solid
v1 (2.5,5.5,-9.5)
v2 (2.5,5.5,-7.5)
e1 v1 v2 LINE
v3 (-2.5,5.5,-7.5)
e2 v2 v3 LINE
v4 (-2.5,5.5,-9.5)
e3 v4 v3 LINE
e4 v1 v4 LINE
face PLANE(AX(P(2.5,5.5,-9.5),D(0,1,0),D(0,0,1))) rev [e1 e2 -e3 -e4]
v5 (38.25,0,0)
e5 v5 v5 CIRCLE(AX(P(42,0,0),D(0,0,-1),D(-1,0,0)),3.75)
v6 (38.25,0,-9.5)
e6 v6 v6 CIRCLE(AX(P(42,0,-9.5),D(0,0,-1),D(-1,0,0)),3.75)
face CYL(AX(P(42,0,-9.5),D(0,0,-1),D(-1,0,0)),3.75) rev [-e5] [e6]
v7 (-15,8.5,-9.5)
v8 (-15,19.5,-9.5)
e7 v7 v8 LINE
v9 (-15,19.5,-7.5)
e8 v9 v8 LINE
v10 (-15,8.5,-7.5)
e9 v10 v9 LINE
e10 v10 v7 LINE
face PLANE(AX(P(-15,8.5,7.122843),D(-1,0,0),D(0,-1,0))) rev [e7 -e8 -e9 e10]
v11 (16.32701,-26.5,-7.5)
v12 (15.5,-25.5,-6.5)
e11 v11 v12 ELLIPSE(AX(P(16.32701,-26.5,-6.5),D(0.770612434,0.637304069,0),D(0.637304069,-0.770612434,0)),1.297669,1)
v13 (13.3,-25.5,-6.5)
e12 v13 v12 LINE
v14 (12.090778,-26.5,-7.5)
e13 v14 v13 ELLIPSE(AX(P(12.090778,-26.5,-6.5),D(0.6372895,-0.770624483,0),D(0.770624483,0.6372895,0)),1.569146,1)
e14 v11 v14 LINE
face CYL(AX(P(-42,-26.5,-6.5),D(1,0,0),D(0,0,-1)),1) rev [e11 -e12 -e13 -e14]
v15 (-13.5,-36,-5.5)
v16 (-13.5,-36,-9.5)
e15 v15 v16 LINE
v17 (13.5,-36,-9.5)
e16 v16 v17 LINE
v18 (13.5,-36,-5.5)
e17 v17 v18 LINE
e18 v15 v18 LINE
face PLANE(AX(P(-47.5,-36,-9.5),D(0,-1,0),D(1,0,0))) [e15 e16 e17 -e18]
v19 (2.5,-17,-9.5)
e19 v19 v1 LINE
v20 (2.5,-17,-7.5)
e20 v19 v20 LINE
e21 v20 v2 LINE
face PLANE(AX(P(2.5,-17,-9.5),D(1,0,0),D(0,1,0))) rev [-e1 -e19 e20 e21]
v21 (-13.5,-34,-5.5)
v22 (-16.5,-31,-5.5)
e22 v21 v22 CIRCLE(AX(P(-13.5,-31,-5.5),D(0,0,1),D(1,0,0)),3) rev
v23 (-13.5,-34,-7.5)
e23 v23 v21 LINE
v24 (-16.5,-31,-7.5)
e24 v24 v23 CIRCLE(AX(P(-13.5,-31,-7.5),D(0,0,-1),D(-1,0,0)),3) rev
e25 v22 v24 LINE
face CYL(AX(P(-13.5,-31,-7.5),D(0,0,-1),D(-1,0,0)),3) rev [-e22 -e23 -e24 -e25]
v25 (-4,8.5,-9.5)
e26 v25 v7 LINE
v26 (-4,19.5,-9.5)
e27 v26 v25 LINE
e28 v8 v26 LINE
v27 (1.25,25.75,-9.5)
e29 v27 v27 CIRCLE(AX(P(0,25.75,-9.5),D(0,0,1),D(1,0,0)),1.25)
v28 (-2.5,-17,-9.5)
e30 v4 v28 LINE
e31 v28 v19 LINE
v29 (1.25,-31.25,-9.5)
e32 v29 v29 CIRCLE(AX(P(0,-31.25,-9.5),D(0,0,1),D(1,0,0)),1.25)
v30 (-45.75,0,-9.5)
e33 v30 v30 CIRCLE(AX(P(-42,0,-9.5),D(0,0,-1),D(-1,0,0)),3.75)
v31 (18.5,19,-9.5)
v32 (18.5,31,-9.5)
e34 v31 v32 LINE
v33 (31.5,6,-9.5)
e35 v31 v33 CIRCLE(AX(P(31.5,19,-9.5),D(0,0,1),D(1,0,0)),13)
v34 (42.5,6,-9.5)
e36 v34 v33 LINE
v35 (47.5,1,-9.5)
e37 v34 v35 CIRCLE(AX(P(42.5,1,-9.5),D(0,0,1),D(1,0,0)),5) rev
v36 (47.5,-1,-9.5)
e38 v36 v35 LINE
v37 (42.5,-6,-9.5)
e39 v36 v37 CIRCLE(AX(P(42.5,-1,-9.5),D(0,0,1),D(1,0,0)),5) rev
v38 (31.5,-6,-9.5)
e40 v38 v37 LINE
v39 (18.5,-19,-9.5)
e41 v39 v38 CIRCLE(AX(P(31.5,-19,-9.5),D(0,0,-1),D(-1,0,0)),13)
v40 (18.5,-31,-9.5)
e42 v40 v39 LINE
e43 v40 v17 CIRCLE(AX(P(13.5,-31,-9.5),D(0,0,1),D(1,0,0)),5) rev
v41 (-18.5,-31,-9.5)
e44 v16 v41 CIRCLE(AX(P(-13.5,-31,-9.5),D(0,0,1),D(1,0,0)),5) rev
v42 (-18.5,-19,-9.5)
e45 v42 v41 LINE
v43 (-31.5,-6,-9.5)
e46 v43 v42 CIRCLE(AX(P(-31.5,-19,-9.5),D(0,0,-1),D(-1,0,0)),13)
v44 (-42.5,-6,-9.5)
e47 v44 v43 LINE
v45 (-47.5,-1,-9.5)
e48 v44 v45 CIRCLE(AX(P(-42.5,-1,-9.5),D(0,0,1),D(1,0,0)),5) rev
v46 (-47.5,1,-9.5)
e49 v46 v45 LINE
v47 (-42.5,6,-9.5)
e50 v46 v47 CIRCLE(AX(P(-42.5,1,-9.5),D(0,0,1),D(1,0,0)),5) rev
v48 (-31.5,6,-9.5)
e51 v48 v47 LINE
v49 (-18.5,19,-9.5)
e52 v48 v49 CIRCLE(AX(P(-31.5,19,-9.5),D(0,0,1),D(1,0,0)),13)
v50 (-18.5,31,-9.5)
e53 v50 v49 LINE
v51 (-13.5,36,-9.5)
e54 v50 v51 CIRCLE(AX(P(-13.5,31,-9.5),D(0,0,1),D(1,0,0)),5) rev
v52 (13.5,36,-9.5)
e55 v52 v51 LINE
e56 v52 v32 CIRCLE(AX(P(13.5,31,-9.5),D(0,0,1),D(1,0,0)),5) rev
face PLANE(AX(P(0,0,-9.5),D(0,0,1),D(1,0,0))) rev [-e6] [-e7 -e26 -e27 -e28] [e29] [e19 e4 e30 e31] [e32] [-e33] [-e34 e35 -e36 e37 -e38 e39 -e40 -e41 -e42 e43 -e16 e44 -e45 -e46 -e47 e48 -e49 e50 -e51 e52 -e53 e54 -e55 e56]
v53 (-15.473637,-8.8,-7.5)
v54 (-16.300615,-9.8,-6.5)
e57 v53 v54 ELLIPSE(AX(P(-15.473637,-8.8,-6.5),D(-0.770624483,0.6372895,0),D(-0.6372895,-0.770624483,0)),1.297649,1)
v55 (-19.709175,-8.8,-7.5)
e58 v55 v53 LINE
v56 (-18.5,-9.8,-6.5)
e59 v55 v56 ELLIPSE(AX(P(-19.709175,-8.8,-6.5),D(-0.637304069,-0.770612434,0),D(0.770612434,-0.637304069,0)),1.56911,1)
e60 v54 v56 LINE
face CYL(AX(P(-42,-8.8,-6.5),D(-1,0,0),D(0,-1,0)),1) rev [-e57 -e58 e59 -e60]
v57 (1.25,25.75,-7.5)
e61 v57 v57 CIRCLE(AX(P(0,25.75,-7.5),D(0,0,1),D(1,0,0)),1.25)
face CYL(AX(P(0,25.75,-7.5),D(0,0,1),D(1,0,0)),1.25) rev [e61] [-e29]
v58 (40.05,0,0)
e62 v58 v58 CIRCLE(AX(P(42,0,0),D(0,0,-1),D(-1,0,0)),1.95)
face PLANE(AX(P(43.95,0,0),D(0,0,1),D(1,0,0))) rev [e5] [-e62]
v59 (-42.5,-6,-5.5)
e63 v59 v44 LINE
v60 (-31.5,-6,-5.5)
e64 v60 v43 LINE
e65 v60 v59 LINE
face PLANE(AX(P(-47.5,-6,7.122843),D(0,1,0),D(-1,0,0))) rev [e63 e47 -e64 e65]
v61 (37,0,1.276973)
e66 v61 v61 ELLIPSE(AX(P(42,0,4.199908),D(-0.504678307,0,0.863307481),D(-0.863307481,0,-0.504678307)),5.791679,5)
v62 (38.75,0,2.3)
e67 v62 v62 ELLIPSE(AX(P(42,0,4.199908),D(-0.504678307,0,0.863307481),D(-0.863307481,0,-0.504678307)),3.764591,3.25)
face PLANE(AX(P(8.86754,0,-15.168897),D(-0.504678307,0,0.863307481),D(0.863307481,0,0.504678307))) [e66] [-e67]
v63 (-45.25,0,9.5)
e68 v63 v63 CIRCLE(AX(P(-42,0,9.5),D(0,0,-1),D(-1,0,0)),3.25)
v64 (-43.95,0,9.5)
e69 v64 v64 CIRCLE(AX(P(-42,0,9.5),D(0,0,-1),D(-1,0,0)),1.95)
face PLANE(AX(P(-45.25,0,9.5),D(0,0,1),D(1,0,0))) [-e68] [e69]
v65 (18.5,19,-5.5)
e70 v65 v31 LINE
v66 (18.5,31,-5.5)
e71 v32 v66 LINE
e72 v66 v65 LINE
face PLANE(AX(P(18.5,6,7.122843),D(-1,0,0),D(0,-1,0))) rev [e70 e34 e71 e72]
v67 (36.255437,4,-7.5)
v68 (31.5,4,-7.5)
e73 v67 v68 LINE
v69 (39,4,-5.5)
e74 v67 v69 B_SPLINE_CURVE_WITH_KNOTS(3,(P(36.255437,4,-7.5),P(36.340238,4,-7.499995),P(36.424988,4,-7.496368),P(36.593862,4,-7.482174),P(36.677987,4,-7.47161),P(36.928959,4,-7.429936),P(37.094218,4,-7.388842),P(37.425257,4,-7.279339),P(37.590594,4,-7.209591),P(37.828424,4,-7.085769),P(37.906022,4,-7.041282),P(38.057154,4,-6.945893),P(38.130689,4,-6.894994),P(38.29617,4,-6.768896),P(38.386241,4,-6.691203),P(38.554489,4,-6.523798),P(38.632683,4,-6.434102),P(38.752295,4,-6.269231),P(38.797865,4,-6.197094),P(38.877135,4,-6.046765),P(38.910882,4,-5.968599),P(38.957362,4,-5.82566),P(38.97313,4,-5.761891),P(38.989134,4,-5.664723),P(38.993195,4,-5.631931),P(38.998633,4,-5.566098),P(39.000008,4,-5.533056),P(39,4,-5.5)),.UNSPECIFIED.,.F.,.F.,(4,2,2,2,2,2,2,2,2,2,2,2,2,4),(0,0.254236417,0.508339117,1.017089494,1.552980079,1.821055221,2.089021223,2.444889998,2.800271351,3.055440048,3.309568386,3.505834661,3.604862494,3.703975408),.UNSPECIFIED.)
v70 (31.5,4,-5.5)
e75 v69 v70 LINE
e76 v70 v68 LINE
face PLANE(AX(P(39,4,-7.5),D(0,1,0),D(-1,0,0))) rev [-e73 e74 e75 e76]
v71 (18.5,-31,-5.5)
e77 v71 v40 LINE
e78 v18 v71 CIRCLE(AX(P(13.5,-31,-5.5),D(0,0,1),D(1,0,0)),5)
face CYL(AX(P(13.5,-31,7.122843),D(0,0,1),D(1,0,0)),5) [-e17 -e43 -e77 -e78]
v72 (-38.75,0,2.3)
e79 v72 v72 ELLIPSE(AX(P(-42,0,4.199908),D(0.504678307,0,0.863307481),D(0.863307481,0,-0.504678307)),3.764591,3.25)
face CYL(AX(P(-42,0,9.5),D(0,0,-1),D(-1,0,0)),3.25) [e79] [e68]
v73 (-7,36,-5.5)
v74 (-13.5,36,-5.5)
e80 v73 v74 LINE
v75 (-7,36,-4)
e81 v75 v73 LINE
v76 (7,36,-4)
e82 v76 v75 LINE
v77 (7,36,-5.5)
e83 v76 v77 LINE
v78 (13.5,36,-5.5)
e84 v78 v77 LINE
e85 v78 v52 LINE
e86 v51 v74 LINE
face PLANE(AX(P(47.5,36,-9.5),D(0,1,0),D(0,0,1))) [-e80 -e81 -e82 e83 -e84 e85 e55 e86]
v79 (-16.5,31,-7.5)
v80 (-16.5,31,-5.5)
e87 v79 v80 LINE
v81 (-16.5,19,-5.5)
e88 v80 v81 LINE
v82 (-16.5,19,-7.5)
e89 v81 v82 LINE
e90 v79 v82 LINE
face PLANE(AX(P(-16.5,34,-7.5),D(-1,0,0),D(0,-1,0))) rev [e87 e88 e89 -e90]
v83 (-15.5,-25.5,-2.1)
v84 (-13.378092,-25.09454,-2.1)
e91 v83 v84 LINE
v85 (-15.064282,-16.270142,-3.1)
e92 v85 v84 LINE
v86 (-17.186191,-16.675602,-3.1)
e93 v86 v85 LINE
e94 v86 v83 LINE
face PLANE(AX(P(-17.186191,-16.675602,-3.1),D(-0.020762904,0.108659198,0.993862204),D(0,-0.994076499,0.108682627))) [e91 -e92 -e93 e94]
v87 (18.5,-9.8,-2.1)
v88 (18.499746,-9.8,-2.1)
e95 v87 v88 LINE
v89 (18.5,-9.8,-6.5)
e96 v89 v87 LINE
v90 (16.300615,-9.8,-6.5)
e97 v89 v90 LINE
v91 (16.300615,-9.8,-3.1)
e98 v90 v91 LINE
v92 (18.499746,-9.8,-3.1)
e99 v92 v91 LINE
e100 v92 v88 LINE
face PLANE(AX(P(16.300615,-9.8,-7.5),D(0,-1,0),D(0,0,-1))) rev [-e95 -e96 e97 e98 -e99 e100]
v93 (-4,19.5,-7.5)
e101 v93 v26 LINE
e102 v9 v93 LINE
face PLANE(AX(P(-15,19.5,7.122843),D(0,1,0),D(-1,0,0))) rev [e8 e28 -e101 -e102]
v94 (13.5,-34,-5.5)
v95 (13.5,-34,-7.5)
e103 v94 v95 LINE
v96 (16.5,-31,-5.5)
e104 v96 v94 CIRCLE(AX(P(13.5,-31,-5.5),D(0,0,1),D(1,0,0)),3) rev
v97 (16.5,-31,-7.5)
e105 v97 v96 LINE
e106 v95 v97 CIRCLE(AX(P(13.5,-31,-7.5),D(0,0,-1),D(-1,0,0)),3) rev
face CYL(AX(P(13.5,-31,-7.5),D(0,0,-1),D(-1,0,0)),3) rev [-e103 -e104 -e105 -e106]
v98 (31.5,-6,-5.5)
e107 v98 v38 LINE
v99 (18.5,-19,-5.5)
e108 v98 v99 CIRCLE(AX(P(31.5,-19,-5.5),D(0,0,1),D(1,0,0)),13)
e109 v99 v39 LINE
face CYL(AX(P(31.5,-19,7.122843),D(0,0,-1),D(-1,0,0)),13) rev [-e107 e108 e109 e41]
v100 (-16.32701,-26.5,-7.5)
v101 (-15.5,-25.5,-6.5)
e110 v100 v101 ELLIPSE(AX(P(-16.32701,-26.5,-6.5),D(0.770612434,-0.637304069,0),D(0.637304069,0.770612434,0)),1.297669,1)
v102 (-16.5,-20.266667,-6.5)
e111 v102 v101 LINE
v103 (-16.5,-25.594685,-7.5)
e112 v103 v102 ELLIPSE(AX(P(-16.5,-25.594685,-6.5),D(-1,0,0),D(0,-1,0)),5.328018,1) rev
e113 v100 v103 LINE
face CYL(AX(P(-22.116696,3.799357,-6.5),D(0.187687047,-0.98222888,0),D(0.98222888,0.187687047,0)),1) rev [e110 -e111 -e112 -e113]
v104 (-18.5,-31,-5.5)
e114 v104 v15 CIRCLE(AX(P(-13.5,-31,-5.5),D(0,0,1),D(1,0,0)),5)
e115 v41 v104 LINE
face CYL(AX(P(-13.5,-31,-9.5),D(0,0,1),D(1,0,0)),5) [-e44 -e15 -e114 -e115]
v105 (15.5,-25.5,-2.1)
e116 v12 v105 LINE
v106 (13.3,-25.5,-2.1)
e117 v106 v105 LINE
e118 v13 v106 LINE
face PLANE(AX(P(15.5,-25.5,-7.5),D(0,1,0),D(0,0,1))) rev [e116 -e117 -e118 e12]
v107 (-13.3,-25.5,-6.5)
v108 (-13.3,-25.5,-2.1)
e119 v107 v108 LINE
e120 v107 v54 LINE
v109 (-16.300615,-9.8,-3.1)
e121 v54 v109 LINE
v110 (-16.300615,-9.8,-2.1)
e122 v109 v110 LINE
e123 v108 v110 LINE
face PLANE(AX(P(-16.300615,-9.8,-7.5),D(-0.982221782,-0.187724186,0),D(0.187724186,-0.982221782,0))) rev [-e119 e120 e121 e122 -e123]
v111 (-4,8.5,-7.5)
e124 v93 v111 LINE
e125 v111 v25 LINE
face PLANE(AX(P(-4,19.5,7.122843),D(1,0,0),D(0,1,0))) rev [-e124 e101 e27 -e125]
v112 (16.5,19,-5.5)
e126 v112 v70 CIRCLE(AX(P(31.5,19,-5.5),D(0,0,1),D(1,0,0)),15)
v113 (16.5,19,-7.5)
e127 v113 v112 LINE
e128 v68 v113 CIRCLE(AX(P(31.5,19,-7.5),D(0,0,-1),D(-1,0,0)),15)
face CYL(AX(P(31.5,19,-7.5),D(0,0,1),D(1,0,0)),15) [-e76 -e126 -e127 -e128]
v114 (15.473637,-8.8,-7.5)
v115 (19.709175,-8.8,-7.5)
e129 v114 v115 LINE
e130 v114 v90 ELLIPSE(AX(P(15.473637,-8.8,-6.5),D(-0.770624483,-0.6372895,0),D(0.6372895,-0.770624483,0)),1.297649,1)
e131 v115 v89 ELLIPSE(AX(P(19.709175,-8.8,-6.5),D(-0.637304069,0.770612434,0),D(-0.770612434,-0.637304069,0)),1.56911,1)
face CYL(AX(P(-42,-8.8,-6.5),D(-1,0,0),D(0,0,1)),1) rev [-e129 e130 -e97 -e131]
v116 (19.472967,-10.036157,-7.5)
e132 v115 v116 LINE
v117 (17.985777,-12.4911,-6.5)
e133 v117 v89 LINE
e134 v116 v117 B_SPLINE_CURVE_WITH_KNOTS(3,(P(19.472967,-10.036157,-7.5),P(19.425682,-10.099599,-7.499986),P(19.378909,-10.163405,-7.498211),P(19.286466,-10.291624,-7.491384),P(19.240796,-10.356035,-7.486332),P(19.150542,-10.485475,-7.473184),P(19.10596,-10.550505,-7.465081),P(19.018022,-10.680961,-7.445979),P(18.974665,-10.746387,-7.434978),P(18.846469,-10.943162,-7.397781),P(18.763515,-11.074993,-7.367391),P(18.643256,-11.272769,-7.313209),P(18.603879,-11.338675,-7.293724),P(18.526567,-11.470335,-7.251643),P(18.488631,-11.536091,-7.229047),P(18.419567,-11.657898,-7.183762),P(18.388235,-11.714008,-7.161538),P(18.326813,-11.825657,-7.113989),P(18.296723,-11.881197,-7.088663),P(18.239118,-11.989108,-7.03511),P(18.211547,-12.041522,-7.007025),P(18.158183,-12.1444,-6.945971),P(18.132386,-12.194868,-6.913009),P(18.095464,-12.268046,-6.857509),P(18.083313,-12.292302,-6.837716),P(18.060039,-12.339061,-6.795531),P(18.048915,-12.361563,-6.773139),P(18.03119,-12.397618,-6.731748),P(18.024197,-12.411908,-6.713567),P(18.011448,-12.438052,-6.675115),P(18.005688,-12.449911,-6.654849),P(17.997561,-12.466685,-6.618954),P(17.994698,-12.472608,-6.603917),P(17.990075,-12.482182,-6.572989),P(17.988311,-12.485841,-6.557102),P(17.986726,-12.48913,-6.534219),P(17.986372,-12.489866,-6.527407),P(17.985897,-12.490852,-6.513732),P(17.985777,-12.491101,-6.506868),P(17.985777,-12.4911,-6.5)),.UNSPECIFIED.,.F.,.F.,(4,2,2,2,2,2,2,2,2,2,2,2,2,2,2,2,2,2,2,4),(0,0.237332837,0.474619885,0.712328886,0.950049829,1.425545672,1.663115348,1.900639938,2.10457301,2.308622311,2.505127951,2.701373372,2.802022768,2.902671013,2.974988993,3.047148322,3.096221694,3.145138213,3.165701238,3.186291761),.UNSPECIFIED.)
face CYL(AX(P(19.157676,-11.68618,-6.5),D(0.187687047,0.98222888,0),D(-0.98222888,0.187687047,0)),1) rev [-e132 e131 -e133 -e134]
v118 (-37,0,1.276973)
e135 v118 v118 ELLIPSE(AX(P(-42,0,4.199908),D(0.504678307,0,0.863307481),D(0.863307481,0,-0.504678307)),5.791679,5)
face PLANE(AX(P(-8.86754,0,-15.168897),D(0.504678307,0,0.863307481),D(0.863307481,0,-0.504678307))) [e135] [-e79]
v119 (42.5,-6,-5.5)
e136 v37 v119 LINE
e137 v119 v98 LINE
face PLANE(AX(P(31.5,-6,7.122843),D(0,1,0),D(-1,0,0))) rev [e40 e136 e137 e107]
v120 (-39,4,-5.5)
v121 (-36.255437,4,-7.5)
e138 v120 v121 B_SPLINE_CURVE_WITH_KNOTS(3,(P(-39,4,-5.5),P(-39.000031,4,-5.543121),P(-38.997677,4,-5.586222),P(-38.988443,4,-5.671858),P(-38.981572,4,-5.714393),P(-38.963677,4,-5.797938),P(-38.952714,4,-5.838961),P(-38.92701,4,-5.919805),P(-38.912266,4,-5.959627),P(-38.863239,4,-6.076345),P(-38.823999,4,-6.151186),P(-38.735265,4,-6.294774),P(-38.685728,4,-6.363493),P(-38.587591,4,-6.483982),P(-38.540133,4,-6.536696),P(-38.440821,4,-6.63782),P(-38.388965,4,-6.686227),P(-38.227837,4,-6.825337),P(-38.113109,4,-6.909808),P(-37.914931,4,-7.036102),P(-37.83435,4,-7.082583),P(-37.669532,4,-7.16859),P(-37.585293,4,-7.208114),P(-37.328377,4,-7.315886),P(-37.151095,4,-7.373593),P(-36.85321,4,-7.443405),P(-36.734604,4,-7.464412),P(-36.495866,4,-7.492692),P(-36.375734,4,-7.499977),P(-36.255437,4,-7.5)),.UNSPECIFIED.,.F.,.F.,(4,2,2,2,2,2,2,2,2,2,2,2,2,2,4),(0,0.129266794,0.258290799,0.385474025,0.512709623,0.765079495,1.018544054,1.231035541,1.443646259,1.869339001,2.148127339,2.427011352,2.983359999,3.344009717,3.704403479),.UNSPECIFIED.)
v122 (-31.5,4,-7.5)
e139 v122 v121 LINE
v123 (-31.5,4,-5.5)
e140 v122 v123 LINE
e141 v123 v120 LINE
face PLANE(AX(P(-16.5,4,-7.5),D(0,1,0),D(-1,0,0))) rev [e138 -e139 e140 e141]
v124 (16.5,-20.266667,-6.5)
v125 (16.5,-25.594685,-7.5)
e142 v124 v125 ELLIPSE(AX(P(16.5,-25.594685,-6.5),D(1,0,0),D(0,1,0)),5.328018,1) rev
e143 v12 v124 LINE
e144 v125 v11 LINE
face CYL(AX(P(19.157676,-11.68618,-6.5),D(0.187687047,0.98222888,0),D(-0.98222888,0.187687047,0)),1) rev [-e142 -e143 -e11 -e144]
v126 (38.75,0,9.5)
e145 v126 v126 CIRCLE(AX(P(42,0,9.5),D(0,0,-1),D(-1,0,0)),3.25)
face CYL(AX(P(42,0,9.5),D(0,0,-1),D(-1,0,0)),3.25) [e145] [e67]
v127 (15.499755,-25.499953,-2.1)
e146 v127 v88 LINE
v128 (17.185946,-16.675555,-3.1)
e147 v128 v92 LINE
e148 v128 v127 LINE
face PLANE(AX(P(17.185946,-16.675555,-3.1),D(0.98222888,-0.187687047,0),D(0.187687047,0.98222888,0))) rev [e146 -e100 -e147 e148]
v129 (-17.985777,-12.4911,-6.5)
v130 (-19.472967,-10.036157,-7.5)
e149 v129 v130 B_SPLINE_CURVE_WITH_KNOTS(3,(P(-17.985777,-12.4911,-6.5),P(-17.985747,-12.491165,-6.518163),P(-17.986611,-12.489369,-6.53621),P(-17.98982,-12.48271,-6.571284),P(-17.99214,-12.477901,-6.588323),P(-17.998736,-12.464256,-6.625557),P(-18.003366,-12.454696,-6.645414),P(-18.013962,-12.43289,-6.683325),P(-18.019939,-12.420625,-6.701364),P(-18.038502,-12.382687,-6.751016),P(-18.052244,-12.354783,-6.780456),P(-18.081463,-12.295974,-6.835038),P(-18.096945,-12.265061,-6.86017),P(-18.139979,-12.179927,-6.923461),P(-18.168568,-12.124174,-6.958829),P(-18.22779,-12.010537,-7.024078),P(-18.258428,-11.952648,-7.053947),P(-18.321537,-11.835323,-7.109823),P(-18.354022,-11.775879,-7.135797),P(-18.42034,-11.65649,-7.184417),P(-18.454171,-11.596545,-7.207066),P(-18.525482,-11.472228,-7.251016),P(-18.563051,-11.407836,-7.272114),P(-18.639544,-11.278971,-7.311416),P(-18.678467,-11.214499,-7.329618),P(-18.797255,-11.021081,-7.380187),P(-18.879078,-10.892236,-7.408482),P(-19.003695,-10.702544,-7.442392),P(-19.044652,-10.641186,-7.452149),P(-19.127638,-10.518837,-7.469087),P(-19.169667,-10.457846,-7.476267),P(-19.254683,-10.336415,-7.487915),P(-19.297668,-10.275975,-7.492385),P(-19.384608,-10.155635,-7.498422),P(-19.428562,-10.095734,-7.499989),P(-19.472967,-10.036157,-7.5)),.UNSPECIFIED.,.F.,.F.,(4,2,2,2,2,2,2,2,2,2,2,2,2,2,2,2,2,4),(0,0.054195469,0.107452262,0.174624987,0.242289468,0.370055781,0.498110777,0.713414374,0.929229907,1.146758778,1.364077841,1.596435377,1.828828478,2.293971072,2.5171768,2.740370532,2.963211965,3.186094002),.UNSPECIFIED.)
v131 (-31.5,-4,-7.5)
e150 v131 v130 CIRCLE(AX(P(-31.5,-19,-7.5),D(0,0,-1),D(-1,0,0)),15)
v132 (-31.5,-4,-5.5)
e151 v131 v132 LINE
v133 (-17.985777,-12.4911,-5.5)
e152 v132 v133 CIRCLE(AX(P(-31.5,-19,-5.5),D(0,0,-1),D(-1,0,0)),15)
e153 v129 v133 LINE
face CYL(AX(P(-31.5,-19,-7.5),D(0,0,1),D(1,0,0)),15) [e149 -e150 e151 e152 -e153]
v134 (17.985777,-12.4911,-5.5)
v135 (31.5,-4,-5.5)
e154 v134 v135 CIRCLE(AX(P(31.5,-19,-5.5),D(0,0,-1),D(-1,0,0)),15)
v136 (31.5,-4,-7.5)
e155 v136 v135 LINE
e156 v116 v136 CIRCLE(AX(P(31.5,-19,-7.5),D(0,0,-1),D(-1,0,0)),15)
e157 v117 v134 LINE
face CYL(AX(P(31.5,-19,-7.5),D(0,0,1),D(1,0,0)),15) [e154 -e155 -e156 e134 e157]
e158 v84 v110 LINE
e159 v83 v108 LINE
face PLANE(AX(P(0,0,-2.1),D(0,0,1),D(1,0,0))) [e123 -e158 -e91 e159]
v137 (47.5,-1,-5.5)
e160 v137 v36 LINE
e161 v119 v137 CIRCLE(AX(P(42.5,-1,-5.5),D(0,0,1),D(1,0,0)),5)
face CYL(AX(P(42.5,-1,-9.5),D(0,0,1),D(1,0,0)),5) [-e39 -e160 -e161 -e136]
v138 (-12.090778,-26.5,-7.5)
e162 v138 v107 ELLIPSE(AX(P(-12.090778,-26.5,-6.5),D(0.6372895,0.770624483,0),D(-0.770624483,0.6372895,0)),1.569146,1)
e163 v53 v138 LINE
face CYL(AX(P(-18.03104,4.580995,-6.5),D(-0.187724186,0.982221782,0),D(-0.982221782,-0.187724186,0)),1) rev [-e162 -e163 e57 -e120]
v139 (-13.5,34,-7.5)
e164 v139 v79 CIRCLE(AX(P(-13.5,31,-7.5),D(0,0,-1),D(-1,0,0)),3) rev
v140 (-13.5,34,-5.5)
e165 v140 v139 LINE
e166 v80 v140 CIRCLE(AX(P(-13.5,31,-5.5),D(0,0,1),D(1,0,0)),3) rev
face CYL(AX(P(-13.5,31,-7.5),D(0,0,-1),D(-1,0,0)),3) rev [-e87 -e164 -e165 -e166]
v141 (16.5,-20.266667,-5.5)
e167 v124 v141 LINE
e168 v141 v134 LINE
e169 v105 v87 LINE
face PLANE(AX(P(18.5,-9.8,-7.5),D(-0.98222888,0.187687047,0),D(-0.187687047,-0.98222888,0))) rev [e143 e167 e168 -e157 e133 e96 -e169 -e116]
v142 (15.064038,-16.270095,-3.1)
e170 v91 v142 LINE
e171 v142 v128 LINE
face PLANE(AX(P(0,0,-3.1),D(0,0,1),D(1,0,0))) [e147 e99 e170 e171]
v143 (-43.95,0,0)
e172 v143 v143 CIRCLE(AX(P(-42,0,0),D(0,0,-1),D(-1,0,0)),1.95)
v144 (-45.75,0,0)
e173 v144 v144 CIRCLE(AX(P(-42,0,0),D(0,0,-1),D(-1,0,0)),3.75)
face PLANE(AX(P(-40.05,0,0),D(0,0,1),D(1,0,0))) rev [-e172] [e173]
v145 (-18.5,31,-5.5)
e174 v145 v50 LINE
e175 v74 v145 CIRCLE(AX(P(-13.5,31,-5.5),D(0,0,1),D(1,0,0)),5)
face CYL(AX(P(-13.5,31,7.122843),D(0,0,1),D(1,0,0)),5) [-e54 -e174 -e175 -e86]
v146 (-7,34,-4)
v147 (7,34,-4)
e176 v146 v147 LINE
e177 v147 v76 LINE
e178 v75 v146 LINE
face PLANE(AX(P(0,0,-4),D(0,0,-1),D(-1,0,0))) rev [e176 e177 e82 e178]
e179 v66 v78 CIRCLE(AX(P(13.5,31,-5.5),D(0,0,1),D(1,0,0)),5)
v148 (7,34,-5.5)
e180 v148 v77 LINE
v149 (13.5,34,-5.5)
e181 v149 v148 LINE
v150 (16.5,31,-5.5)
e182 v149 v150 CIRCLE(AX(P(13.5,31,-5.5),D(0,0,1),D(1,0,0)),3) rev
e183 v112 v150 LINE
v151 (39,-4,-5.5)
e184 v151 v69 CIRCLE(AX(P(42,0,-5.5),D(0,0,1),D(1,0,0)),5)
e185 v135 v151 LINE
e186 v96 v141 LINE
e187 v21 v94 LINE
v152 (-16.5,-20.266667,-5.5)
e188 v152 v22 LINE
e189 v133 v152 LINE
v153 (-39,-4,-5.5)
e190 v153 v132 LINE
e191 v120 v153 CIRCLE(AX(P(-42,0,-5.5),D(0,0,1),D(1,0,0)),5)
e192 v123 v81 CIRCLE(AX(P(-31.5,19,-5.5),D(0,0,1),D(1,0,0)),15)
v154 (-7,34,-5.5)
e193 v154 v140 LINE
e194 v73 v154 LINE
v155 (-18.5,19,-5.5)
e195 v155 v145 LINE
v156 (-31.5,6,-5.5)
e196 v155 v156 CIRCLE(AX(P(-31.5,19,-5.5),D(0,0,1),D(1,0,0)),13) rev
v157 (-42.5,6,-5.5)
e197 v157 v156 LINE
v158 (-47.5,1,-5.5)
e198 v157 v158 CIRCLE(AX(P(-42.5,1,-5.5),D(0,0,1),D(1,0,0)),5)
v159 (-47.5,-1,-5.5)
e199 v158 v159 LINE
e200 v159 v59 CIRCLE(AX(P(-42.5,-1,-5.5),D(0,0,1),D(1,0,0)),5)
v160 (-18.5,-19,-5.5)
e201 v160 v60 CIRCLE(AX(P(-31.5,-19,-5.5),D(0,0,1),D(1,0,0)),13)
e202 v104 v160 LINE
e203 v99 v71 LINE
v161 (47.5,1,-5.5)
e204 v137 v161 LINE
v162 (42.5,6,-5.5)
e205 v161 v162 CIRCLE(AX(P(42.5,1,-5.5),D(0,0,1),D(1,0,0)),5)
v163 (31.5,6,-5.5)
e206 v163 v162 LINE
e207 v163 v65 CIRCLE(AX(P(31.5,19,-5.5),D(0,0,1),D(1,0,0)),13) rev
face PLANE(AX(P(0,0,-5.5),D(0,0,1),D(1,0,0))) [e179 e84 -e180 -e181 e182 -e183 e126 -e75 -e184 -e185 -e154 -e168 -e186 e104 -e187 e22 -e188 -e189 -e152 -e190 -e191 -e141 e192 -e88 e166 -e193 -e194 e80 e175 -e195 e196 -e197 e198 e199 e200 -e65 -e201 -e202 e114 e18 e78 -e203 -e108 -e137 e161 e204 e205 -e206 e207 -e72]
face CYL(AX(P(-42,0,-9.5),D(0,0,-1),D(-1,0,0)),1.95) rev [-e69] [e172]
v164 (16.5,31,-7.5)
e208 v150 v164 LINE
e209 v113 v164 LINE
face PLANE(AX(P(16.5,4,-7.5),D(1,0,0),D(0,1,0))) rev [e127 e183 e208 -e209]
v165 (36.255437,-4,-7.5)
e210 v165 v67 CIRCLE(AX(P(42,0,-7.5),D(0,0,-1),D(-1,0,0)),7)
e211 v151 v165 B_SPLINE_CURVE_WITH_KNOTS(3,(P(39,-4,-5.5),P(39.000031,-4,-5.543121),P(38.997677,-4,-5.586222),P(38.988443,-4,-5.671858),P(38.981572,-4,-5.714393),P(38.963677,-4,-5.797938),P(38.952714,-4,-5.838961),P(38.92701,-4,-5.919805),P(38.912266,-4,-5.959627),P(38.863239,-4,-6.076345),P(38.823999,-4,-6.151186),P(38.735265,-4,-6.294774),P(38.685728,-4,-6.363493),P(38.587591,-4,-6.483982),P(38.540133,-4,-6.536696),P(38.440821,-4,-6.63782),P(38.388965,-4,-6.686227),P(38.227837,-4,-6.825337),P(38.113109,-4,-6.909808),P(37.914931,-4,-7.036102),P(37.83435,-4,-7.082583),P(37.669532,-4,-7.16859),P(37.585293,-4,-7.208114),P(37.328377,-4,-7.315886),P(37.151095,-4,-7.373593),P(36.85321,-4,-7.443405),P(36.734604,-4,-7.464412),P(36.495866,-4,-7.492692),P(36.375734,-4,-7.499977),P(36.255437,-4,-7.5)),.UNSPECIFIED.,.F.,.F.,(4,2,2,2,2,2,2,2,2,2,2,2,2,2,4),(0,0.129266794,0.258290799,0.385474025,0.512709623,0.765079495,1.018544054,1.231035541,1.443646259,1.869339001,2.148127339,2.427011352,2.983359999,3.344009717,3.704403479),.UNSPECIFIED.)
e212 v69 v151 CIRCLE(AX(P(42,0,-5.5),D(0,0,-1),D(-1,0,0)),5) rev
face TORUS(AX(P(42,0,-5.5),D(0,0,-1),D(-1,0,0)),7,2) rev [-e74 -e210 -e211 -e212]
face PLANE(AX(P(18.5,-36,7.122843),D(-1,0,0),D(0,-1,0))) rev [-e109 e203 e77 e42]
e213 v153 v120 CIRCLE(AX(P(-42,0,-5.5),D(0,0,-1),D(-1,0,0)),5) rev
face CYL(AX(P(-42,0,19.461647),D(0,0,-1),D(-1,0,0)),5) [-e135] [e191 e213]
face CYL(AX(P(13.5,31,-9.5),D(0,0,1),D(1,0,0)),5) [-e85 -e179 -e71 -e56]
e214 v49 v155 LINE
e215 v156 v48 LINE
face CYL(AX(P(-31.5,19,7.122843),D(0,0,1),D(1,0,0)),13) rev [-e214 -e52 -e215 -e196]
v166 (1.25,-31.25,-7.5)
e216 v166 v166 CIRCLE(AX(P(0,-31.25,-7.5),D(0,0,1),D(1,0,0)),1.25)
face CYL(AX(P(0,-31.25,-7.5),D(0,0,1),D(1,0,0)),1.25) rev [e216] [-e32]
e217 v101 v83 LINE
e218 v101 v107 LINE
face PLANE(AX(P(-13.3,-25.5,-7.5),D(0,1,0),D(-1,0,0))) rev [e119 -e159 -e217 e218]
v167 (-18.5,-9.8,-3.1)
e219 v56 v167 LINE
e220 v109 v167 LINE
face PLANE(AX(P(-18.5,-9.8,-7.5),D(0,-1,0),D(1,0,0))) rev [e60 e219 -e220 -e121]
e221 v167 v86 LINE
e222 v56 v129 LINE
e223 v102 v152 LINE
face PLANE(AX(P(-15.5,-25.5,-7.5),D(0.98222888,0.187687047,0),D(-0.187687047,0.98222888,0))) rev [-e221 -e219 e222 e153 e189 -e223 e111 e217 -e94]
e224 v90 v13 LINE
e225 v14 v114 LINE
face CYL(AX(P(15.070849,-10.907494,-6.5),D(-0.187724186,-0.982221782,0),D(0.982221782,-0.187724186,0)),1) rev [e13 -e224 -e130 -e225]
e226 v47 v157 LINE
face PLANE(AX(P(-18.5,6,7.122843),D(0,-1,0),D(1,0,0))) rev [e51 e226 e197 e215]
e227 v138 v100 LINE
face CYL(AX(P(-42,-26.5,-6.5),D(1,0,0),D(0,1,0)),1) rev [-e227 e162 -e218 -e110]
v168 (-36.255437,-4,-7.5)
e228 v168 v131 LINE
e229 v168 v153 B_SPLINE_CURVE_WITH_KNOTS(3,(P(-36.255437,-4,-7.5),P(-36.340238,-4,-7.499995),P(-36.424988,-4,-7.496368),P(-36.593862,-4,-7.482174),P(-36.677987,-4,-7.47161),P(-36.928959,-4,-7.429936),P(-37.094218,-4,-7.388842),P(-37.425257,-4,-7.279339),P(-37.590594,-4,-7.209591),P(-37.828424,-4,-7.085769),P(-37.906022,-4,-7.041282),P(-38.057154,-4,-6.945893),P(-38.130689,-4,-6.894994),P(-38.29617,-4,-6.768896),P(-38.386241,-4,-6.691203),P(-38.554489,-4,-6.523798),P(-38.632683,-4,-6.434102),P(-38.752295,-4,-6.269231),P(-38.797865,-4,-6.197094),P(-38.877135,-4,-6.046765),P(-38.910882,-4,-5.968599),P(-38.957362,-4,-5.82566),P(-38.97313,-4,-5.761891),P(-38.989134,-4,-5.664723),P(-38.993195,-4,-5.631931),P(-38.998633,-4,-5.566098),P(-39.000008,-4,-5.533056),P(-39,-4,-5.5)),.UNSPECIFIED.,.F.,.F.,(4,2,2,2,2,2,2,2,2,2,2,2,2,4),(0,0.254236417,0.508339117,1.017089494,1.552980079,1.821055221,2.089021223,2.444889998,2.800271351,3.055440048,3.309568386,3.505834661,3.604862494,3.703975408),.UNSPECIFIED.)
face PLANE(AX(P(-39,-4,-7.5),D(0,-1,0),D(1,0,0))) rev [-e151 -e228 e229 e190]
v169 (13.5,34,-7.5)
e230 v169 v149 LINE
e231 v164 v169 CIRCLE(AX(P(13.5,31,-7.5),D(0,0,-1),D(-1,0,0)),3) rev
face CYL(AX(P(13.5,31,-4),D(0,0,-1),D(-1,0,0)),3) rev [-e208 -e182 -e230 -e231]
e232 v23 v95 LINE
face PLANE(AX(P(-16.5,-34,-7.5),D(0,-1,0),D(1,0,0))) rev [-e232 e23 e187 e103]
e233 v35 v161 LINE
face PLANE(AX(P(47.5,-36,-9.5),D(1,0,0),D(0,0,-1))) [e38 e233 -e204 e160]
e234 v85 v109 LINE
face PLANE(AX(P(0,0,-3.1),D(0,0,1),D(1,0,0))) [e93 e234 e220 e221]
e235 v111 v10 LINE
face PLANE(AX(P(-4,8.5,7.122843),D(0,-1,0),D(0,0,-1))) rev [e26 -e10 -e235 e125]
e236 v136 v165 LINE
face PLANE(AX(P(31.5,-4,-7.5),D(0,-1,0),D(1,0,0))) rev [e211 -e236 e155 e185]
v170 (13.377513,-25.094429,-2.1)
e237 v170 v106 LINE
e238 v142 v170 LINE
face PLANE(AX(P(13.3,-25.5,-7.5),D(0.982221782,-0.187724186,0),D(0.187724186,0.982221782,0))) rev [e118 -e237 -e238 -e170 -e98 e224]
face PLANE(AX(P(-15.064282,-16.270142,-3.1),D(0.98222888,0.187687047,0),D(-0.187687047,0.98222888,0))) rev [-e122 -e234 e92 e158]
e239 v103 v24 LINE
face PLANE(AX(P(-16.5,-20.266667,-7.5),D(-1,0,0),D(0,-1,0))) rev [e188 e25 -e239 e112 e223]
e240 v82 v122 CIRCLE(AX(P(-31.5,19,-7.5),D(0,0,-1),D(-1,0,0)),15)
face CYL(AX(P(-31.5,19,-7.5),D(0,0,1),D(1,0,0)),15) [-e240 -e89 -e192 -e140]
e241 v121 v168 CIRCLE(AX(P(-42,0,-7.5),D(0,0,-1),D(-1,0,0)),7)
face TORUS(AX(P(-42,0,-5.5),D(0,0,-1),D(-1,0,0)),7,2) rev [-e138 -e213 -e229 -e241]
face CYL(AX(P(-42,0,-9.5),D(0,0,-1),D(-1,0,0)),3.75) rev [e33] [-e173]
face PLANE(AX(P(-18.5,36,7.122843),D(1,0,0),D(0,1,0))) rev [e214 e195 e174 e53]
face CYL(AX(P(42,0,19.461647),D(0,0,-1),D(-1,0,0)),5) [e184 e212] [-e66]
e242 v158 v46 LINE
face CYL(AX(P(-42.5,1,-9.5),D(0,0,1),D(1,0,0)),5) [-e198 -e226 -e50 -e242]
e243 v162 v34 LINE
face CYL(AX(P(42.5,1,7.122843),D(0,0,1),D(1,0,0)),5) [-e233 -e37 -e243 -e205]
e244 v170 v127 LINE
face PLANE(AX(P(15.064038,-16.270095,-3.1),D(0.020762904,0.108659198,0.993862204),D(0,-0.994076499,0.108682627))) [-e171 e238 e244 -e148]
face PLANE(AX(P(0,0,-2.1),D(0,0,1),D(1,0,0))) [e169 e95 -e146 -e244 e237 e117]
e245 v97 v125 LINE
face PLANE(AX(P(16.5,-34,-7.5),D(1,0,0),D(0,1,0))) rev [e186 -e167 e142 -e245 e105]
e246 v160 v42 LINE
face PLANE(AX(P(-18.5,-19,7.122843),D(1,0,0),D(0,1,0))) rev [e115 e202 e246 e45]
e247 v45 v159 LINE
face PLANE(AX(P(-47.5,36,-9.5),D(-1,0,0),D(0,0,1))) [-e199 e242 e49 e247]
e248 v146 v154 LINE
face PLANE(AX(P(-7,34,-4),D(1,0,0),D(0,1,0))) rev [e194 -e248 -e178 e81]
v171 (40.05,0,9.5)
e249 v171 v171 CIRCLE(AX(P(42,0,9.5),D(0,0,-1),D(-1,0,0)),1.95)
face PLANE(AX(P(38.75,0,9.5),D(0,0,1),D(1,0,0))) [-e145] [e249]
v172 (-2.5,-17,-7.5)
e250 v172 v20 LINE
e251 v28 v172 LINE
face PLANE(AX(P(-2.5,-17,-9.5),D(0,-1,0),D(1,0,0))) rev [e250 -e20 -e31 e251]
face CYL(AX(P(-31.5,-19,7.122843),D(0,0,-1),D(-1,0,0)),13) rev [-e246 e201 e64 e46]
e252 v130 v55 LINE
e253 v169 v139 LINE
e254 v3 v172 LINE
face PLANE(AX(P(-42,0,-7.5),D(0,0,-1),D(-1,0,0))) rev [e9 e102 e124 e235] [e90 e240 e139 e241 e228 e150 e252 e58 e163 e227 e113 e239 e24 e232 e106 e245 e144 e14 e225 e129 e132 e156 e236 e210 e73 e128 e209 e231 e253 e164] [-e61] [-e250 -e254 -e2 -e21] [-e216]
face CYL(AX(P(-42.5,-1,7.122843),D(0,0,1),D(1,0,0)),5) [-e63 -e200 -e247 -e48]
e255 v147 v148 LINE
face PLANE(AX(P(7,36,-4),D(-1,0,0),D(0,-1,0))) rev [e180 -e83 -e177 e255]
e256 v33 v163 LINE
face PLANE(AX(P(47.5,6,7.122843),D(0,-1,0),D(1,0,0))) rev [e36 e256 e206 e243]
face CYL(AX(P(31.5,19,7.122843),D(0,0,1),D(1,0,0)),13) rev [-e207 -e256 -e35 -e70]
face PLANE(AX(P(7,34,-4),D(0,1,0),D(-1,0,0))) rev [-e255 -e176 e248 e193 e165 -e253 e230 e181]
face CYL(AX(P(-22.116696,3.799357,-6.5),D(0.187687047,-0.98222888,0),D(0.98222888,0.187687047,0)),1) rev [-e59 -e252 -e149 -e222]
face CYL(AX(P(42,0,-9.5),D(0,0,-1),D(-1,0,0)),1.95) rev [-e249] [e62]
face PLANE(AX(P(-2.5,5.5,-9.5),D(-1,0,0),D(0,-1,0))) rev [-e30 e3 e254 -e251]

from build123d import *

# Parameters (mm, degrees)
BOSS_EXTRUDE1_DEPTH = 4
BOSS_EXTRUDE2_DEPTH = 1.5000000000000004
BOSS_EXTRUDE3_REACH = 61.735
SKETCH4_R           = 4.999999999999997
BOSS_EXTRUDE4_REACH = 62.923
SKETCH6_R           = 4.999999999999997
CUT_EXTRUDE1_START  = -1.9999999999999991
CUT_EXTRUDE1_DEPTH  = 1.9999999999999991
BOSS_EXTRUDE5_DEPTH = 3.4000000000000004
BOSS_EXTRUDE6_DEPTH = 3.4000000000000004
CUT_EXTRUDE2_DEPTH  = 62.875430452853614
CUT_EXTRUDE3_DEPTH  = 62.875430452853614
CUT_EXTRUDE4_DEPTH  = 1
CUT_EXTRUDE5_DEPTH  = 62.875430452853614
CUT_EXTRUDE6_DEPTH  = 1
CUT_EXTRUDE7_DEPTH  = 62.87543045285361
CUT_EXTRUDE8_DEPTH  = 62.36837559861016
CUT_EXTRUDE9_DEPTH  = 62.87543045285361
DRAFT1_START        = -20.010567338
DRAFT1_DEPTH        = 2.160299157
DRAFT2_ANGLE        = 83.64864717560759
HOLE1_D             = 2.5
HOLE2_D             = 2.5
HOLE3_D             = 3.9
HOLE3_CBORE_D       = 7.5
HOLE3_CBORE_DEPTH   = 9.5
HOLE4_D             = 3.9
HOLE4_CBORE_D       = 7.5
HOLE4_CBORE_DEPTH   = 9.5
FILLET1_R           = 1
FILLET2_R           = 1
FILLET3_R           = 2
FILLET4_R           = 2
FILLET5_R           = 2.9999999999999996
FILLET6_R           = 2.9999999999999996
FILLET7_R           = 2.9999999999999996
FILLET8_R           = 2.9999999999999996
FILLET9_R           = 5
FILLET10_R          = 5
FILLET11_R          = 5
FILLET12_R          = 5
FILLET13_R          = 5
FILLET14_R          = 5
FILLET15_R          = 5
FILLET16_R          = 5
FILLET17_R          = 13.000000000000002
FILLET18_R          = 13.000000000000002
FILLET19_R          = 15.000000000000004
FILLET20_R          = 15.000000000000004


# Read off the part's stored shape, not the designer's step: Draft1
with BuildPart() as part:
    # Sketch1 → Boss-Extrude1 (new body)
    with BuildSketch(Plane.XY.offset(-5.5)):
        Polygon((47.5, -36), (47.5, 36.00000000000001), (-47.5, 36.00000000000001), (-47.5, -36.00000000000002), align=None)
    extrude(amount=-BOSS_EXTRUDE1_DEPTH)

    # Sketch2 → Boss-Extrude2 (add)
    with BuildSketch(Plane.XY.offset(-5.5)):
        Polygon((-7, 36.00000000000001), (6.999999999999999, 36.00000000000001), (7, 34.00000000000001), (-7.000000000000001, 34), align=None)
    extrude(amount=BOSS_EXTRUDE2_DEPTH)

    # Boss-Extrude3: up to this plane
    boss_extrude3_end = Plane(origin=(8.867539620332717, 0, -15.16889706351879), z_dir=(-0.504678307080911, 0, 0.863307480774924))
    # Sketch4 → Boss-Extrude3 (add, up to the surface)
    with BuildSketch(Plane.XY.offset(-5.5), mode=Mode.PRIVATE) as boss_extrude3_sk1:
        with Locations(Location((42, -4.72e-15, 0), (0, 0, 180))):
            Circle(SKETCH4_R)
    boss_extrude3_tool1 = split(extrude(boss_extrude3_sk1.sketch, amount=BOSS_EXTRUDE3_REACH, mode=Mode.PRIVATE), bisect_by=boss_extrude3_end, keep=Keep.BOTH, mode=Mode.PRIVATE)
    add(boss_extrude3_tool1.solids().sort_by_distance((42, 0, -5.5))[0])

    # Boss-Extrude4: up to this plane
    boss_extrude4_end = Plane(origin=(-8.867539620332735, 0, -15.16889706351882), z_dir=(0.504678307080911, 0, 0.863307480774924))
    # Sketch6 → Boss-Extrude4 (add, up to the surface)
    with BuildSketch(Plane.XY.offset(-5.5), mode=Mode.PRIVATE) as boss_extrude4_sk1:
        with Locations((-42, -4.72e-15)):
            Circle(SKETCH6_R)
    boss_extrude4_tool1 = split(extrude(boss_extrude4_sk1.sketch, amount=BOSS_EXTRUDE4_REACH, mode=Mode.PRIVATE), bisect_by=boss_extrude4_end, keep=Keep.BOTH, mode=Mode.PRIVATE)
    add(boss_extrude4_tool1.solids().sort_by_distance((-42, 0, -5.5))[0])

    # Sketch7 → Cut-Extrude1 (cut)
    with BuildSketch(Plane.XY.offset(-5.5).offset(CUT_EXTRUDE1_START)):
        with BuildLine():
            Line((16.5, 34.00000000000002), (-16.499999999999996, 33.99999999999999))
            Line((-16.499999999999996, 33.99999999999999), (-16.500000000000007, 3.9999999999999964))
            Line((-16.500000000000007, 3.9999999999999964), (-39.00000000000001, 4))
            ThreePointArc((-39.00000000000001, 4), (-37, -2.8e-16), (-39, -4.000000000000003))
            Line((-39, -4.000000000000003), (-31.5, -4))
            ThreePointArc((-31.5, -4), (-23.519821394067325, -6.298946916990921), (-17.98577705522076, -12.491100077678077))
            Line((-17.98577705522076, -12.491100077678077), (-18.500000000000014, -9.800000000000002))
            Line((-18.500000000000014, -9.800000000000002), (-16.3006153135025, -9.8))
            Line((-16.3006153135025, -9.8), (-13.3, -25.500000000000004))
            Line((-13.3, -25.500000000000004), (-15.499999999999995, -25.5))
            Line((-15.499999999999995, -25.5), (-16.499999999999975, -20.266666666666797))
            Line((-16.499999999999975, -20.266666666666797), (-16.500000000000004, -34.00000000000001))
            Line((-16.500000000000004, -34.00000000000001), (16.500000000000007, -34))
            Line((16.500000000000007, -34), (16.5, -20.266666666666687))
            Line((16.5, -20.266666666666687), (15.5, -25.500000000000004))
            Line((15.5, -25.500000000000004), (13.3, -25.500000000000004))
            Line((13.3, -25.500000000000004), (16.3006153135025, -9.800000000000002))
            Line((16.3006153135025, -9.800000000000002), (18.500000000000014, -9.800000000000002))
            Line((18.500000000000014, -9.800000000000002), (17.985777055220748, -12.491100077678167))
            ThreePointArc((17.985777055220748, -12.491100077678167), (23.519821394067314, -6.29894691699096), (31.50000000000003, -3.9999999999999982))
            Line((31.50000000000003, -3.9999999999999982), (38.99999999999999, -4))
            ThreePointArc((38.99999999999999, -4), (37, 3.55e-15), (39.00000000000001, 4))
            Line((39.00000000000001, 4), (16.500000000000014, 3.9999999999999982))
            Line((16.500000000000014, 3.9999999999999982), (16.5, 34.00000000000002))
        make_face()
    extrude(amount=CUT_EXTRUDE1_DEPTH, mode=Mode.SUBTRACT)

    # Sketch8 → Boss-Extrude5 (add)
    with BuildSketch(Plane.XY.offset(-5.5)):
        Polygon((13.3, -25.500000000000004), (16.3006153135025, -9.8), (18.500000000000018, -9.799999999999999), (15.5, -25.500000000000004), align=None)
    extrude(amount=BOSS_EXTRUDE5_DEPTH)

    # Sketch9 → Boss-Extrude6 (add)
    with BuildSketch(Plane.XY.offset(-5.5)):
        Polygon((-16.300615313502515, -9.800000000000002), (-13.3, -25.500000000000004), (-15.5, -25.500000000000004), (-18.500000000000014, -9.800000000000002), align=None)
    extrude(amount=BOSS_EXTRUDE6_DEPTH)

    # Sketch10 → Cut-Extrude2 (cut, through all)
    with BuildSketch(Plane(origin=(0, 0, -9.5), x_dir=(-1, 0, 0), z_dir=(0, 0, -1))):
        Polygon((-47.5, 6.000000000000003), (-18.500000000000004, 6), (-18.5, 36.00000000000001), (-47.5, 36.00000000000001), align=None)
    extrude(amount=-CUT_EXTRUDE2_DEPTH, mode=Mode.SUBTRACT)

    # Sketch11 → Cut-Extrude3 (cut, through all)
    with BuildSketch(Plane(origin=(0, 0, -9.5), x_dir=(-1, 0, 0), z_dir=(0, 0, -1))):
        Polygon((47.5, 36.00000000000001), (18.5, 36.00000000000001), (18.499999999999996, 5.999999999999998), (47.49999999999999, 6.000000000000001), align=None)
    extrude(amount=-CUT_EXTRUDE3_DEPTH, mode=Mode.SUBTRACT)

    # Sketch12 → Cut-Extrude4 (cut)
    with BuildSketch(Plane.XY.offset(-2.099999999999998)):
        Polygon((-17.186190669421556, -16.675602163360537), (-15.064282448454913, -16.27014199374907), (-16.300615313502515, -9.800000000000002), (-18.500000000000014, -9.800000000000002), align=None)
    extrude(amount=-CUT_EXTRUDE4_DEPTH, mode=Mode.SUBTRACT)

    # Sketch13 → Cut-Extrude5 (cut, through all)
    with BuildSketch(Plane(origin=(0, 0, -9.5), x_dir=(-1, 0, 0), z_dir=(0, 0, -1))):
        with BuildLine():
            Line((47.499999999999986, -36.00000000000002), (47.5, -5.999999999999995))
            Line((47.5, -5.999999999999995), (31.5, -5.999999999999999))
            ThreePointArc((31.5, -5.999999999999999), (22.307611844574883, -9.80761184457488), (18.499999999999996, -19))
            Line((18.499999999999996, -19), (18.500000000000004, -36.00000000000001))
            Line((18.500000000000004, -36.00000000000001), (47.499999999999986, -36.00000000000002))
        make_face()
    extrude(amount=-CUT_EXTRUDE5_DEPTH, mode=Mode.SUBTRACT)

    # Sketch14 → Cut-Extrude6 (cut)
    with BuildSketch(Plane.XY.offset(-2.0999999999999996)):
        Polygon((16.30037067134624, -9.799953248297177), (15.064037806298458, -16.27009524204621), (17.185946027265093, -16.675555411657736), (18.499755357843753, -9.799953248297179), align=None)
    extrude(amount=-CUT_EXTRUDE6_DEPTH, mode=Mode.SUBTRACT)

    # Sketch15 → Cut-Extrude7 (cut, through all)
    with BuildSketch(Plane(origin=(0, 0, -9.5), x_dir=(-1, 0, 0), z_dir=(0, 0, -1))):
        with BuildLine():
            Line((-47.5, -36), (-18.500000000000004, -36.00000000000001))
            Line((-18.500000000000004, -36.00000000000001), (-18.5, -19))
            ThreePointArc((-18.5, -19), (-22.30761184457488, -9.807611844574883), (-31.5, -5.999999999999999))
            Line((-31.5, -5.999999999999999), (-47.5, -6))
            Line((-47.5, -6), (-47.5, -36))
        make_face()
    extrude(amount=-CUT_EXTRUDE7_DEPTH, mode=Mode.SUBTRACT)

    # Sketch16 → Cut-Extrude8 (cut, through all)
    with BuildSketch(Plane.XY.offset(-7.499999999999999)):
        Polygon((2.4999999999999987, 5.5), (-2.4999999999999996, 5.5), (-2.499999999999998, -17), (2.4999999999999996, -16.999999999999996), align=None)
    extrude(amount=-CUT_EXTRUDE8_DEPTH, mode=Mode.SUBTRACT)

    # Sketch17 → Cut-Extrude9 (cut, through all)
    with BuildSketch(Plane(origin=(0, 0, -9.5), x_dir=(-1, 0, 0), z_dir=(0, 0, -1))):
        Polygon((4, 8.5), (15, 8.5), (15.000000000000002, 19.5), (4.000000000000001, 19.500000000000004), align=None)
    extrude(amount=-CUT_EXTRUDE9_DEPTH, mode=Mode.SUBTRACT)

    # Draft1 outline → Draft1 (cut)
    with BuildSketch(Plane(origin=(0, 0, 0), x_dir=(-0.18768704709924006, 0.9822288798193461, 0), z_dir=(0.9822288798193463, 0.18768704709924006, 0)).offset(DRAFT1_START)):
        Polygon((-22.13768721, -2.1), (-13.153632656, -3.1), (-13.153632656, -2.1), align=None)
    extrude(amount=DRAFT1_DEPTH, mode=Mode.SUBTRACT)

    # Draft2
    draft2_faces = [part.faces().sort_by_distance(p)[0] for p in [
        (16.124991916781777, -16.472825326851975, -2.5999999999999996),
    ]]
    draft(draft2_faces, Plane.XY.offset(-3.0999999999999996), DRAFT2_ANGLE)

    # Sketch18 → Revolve1 (revolve)
    with BuildSketch(Plane(origin=(0, 0, 0), x_dir=(1, 0, 0), z_dir=(0, 1, 0)), mode=Mode.PRIVATE) as revolve1_sk:
        Polygon((-45.25, -9.5), (-42, -9.5), (-42, -2.299999999999974), (-45.25000000000001, -2.299999999999974), align=None)
    revolve(revolve1_sk.sketch.rotate(Axis((-42, 0, 9.5), (0, 0, -1)), 233.130102354), axis=Axis((-42, 0, 9.5), (0, 0, -1)))

    # Sketch19 → Revolve2 (revolve)
    with BuildSketch(Plane(origin=(0, 0, 0), x_dir=(1, 0, 0), z_dir=(0, 1, 0))):
        Polygon((38.75000000000001, -9.5), (42, -9.5), (42, -2.300000000000015), (38.75, -2.300000000000015), align=None)
    revolve(axis=Axis((42, 0, 9.5), (0, 0, -1)))

    # Hole1 (through all)
    with Locations(Plane.XY.offset(-7.499999999999999)):
        with Locations((0, -31.25)):
            Hole(HOLE1_D / 2)

    # Hole2 (through all)
    with Locations(Plane.XY.offset(-7.499999999999999)):
        with Locations((0, 25.75)):
            Hole(HOLE2_D / 2)

    # Hole3 (through all)
    with Locations(Plane(origin=(0, 0, -9.5), x_dir=(-1, 0, 0), z_dir=(0, 0, -1))):
        with Locations((42, 0)):
            CounterBoreHole(HOLE3_D / 2, HOLE3_CBORE_D / 2, HOLE3_CBORE_DEPTH)

    # Hole4 (through all)
    with Locations(Plane(origin=(0, 0, -9.5), x_dir=(-1, 0, 0), z_dir=(0, 0, -1))):
        with Locations((-42, 0)):
            CounterBoreHole(HOLE4_D / 2, HOLE4_CBORE_D / 2, HOLE4_CBORE_DEPTH)

    # Fillet1
    fillet1_edges = [part.edges().sort_by_distance(p)[0] for p in [
        (18.242888527610383, -11.145550038839085, -7.499999999999999),
        (17.40030765675126, -9.800000000000002, -7.499999999999999),
        (14.80030765675125, -17.650000000000002, -7.499999999999999),
        (14.4, -25.500000000000004, -7.499999999999999),
        (16, -22.883333333333347, -7.499999999999999),
    ]]
    fillet(fillet1_edges, radius=FILLET1_R)

    # Fillet2
    fillet2_edges = [part.edges().sort_by_distance(p)[0] for p in [
        (-15.999999999999986, -22.883333333333397, -7.499999999999999),
        (-14.399999999999999, -25.5, -7.499999999999999),
        (-14.80030765675125, -17.650000000000002, -7.499999999999999),
        (-17.40030765675126, -9.8, -7.499999999999999),
        (-18.242888527610386, -11.14555003883904, -7.499999999999999),
    ]]
    fillet(fillet2_edges, radius=FILLET2_R)

    # Fillet3
    fillet3_edges = [part.edges().sort_by_distance(p)[0] for p in [
        (-37, 3.3e-16, -7.499999999999999),
    ]]
    fillet(fillet3_edges, radius=FILLET3_R - 0.0001)  # a hair under: the kernel refuses the full size

    # Fillet4
    fillet4_edges = [part.edges().sort_by_distance(p)[0] for p in [
        (37, 3.11e-15, -7.499999999999999),
    ]]
    fillet(fillet4_edges, radius=FILLET4_R - 0.0001)  # a hair under: the kernel refuses the full size

    # Fillet5
    fillet5_edges = [part.edges().sort_by_distance(p)[0] for p in [
        (-16.499999999999996, 33.99999999999999, -6.5),
    ]]
    fillet(fillet5_edges, radius=FILLET5_R)

    # Fillet6
    fillet6_edges = [part.edges().sort_by_distance(p)[0] for p in [
        (16.5, 34.00000000000002, -6.5),
    ]]
    fillet(fillet6_edges, radius=FILLET6_R)

    # Fillet7
    fillet7_edges = [part.edges().sort_by_distance(p)[0] for p in [
        (-16.500000000000004, -34.00000000000001, -6.5),
    ]]
    fillet(fillet7_edges, radius=FILLET7_R)

    # Fillet8
    fillet8_edges = [part.edges().sort_by_distance(p)[0] for p in [
        (16.500000000000007, -34, -6.5),
    ]]
    fillet(fillet8_edges, radius=FILLET8_R)

    # Fillet9
    fillet9_edges = [part.edges().sort_by_distance(p)[0] for p in [
        (-18.5, 36.00000000000001, -7.5),
    ]]
    fillet(fillet9_edges, radius=FILLET9_R)

    # Fillet10
    fillet10_edges = [part.edges().sort_by_distance(p)[0] for p in [
        (-47.5, -5.999999999999995, -7.5),
    ]]
    fillet(fillet10_edges, radius=FILLET10_R)

    # Fillet11
    fillet11_edges = [part.edges().sort_by_distance(p)[0] for p in [
        (-47.49999999999999, 6.000000000000001, -7.5),
    ]]
    fillet(fillet11_edges, radius=FILLET11_R)

    # Fillet12
    fillet12_edges = [part.edges().sort_by_distance(p)[0] for p in [
        (18.500000000000004, -36.00000000000001, -7.5),
    ]]
    fillet(fillet12_edges, radius=FILLET12_R)

    # Fillet13
    fillet13_edges = [part.edges().sort_by_distance(p)[0] for p in [
        (47.5, 6.000000000000003, -7.5),
    ]]
    fillet(fillet13_edges, radius=FILLET13_R)

    # Fillet14
    fillet14_edges = [part.edges().sort_by_distance(p)[0] for p in [
        (18.5, 36.00000000000001, -7.5),
    ]]
    fillet(fillet14_edges, radius=FILLET14_R)

    # Fillet15
    fillet15_edges = [part.edges().sort_by_distance(p)[0] for p in [
        (-18.500000000000004, -36.00000000000001, -7.5),
    ]]
    fillet(fillet15_edges, radius=FILLET15_R)

    # Fillet16
    fillet16_edges = [part.edges().sort_by_distance(p)[0] for p in [
        (47.5, -6, -7.5),
    ]]
    fillet(fillet16_edges, radius=FILLET16_R)

    # Fillet17
    fillet17_edges = [part.edges().sort_by_distance(p)[0] for p in [
        (-18.499999999999996, 5.999999999999998, -7.5),
    ]]
    fillet(fillet17_edges, radius=FILLET17_R)

    # Fillet18
    fillet18_edges = [part.edges().sort_by_distance(p)[0] for p in [
        (18.500000000000004, 6, -7.5),
    ]]
    fillet(fillet18_edges, radius=FILLET18_R)

    # Fillet19
    fillet19_edges = [part.edges().sort_by_distance(p)[0] for p in [
        (-16.500000000000007, 3.9999999999999964, -6.5),
    ]]
    fillet(fillet19_edges, radius=FILLET19_R)

    # Fillet20
    fillet20_edges = [part.edges().sort_by_distance(p)[0] for p in [
        (16.500000000000014, 3.9999999999999982, -6.5),
    ]]
    fillet(fillet20_edges, radius=FILLET20_R)


solid = part.part
